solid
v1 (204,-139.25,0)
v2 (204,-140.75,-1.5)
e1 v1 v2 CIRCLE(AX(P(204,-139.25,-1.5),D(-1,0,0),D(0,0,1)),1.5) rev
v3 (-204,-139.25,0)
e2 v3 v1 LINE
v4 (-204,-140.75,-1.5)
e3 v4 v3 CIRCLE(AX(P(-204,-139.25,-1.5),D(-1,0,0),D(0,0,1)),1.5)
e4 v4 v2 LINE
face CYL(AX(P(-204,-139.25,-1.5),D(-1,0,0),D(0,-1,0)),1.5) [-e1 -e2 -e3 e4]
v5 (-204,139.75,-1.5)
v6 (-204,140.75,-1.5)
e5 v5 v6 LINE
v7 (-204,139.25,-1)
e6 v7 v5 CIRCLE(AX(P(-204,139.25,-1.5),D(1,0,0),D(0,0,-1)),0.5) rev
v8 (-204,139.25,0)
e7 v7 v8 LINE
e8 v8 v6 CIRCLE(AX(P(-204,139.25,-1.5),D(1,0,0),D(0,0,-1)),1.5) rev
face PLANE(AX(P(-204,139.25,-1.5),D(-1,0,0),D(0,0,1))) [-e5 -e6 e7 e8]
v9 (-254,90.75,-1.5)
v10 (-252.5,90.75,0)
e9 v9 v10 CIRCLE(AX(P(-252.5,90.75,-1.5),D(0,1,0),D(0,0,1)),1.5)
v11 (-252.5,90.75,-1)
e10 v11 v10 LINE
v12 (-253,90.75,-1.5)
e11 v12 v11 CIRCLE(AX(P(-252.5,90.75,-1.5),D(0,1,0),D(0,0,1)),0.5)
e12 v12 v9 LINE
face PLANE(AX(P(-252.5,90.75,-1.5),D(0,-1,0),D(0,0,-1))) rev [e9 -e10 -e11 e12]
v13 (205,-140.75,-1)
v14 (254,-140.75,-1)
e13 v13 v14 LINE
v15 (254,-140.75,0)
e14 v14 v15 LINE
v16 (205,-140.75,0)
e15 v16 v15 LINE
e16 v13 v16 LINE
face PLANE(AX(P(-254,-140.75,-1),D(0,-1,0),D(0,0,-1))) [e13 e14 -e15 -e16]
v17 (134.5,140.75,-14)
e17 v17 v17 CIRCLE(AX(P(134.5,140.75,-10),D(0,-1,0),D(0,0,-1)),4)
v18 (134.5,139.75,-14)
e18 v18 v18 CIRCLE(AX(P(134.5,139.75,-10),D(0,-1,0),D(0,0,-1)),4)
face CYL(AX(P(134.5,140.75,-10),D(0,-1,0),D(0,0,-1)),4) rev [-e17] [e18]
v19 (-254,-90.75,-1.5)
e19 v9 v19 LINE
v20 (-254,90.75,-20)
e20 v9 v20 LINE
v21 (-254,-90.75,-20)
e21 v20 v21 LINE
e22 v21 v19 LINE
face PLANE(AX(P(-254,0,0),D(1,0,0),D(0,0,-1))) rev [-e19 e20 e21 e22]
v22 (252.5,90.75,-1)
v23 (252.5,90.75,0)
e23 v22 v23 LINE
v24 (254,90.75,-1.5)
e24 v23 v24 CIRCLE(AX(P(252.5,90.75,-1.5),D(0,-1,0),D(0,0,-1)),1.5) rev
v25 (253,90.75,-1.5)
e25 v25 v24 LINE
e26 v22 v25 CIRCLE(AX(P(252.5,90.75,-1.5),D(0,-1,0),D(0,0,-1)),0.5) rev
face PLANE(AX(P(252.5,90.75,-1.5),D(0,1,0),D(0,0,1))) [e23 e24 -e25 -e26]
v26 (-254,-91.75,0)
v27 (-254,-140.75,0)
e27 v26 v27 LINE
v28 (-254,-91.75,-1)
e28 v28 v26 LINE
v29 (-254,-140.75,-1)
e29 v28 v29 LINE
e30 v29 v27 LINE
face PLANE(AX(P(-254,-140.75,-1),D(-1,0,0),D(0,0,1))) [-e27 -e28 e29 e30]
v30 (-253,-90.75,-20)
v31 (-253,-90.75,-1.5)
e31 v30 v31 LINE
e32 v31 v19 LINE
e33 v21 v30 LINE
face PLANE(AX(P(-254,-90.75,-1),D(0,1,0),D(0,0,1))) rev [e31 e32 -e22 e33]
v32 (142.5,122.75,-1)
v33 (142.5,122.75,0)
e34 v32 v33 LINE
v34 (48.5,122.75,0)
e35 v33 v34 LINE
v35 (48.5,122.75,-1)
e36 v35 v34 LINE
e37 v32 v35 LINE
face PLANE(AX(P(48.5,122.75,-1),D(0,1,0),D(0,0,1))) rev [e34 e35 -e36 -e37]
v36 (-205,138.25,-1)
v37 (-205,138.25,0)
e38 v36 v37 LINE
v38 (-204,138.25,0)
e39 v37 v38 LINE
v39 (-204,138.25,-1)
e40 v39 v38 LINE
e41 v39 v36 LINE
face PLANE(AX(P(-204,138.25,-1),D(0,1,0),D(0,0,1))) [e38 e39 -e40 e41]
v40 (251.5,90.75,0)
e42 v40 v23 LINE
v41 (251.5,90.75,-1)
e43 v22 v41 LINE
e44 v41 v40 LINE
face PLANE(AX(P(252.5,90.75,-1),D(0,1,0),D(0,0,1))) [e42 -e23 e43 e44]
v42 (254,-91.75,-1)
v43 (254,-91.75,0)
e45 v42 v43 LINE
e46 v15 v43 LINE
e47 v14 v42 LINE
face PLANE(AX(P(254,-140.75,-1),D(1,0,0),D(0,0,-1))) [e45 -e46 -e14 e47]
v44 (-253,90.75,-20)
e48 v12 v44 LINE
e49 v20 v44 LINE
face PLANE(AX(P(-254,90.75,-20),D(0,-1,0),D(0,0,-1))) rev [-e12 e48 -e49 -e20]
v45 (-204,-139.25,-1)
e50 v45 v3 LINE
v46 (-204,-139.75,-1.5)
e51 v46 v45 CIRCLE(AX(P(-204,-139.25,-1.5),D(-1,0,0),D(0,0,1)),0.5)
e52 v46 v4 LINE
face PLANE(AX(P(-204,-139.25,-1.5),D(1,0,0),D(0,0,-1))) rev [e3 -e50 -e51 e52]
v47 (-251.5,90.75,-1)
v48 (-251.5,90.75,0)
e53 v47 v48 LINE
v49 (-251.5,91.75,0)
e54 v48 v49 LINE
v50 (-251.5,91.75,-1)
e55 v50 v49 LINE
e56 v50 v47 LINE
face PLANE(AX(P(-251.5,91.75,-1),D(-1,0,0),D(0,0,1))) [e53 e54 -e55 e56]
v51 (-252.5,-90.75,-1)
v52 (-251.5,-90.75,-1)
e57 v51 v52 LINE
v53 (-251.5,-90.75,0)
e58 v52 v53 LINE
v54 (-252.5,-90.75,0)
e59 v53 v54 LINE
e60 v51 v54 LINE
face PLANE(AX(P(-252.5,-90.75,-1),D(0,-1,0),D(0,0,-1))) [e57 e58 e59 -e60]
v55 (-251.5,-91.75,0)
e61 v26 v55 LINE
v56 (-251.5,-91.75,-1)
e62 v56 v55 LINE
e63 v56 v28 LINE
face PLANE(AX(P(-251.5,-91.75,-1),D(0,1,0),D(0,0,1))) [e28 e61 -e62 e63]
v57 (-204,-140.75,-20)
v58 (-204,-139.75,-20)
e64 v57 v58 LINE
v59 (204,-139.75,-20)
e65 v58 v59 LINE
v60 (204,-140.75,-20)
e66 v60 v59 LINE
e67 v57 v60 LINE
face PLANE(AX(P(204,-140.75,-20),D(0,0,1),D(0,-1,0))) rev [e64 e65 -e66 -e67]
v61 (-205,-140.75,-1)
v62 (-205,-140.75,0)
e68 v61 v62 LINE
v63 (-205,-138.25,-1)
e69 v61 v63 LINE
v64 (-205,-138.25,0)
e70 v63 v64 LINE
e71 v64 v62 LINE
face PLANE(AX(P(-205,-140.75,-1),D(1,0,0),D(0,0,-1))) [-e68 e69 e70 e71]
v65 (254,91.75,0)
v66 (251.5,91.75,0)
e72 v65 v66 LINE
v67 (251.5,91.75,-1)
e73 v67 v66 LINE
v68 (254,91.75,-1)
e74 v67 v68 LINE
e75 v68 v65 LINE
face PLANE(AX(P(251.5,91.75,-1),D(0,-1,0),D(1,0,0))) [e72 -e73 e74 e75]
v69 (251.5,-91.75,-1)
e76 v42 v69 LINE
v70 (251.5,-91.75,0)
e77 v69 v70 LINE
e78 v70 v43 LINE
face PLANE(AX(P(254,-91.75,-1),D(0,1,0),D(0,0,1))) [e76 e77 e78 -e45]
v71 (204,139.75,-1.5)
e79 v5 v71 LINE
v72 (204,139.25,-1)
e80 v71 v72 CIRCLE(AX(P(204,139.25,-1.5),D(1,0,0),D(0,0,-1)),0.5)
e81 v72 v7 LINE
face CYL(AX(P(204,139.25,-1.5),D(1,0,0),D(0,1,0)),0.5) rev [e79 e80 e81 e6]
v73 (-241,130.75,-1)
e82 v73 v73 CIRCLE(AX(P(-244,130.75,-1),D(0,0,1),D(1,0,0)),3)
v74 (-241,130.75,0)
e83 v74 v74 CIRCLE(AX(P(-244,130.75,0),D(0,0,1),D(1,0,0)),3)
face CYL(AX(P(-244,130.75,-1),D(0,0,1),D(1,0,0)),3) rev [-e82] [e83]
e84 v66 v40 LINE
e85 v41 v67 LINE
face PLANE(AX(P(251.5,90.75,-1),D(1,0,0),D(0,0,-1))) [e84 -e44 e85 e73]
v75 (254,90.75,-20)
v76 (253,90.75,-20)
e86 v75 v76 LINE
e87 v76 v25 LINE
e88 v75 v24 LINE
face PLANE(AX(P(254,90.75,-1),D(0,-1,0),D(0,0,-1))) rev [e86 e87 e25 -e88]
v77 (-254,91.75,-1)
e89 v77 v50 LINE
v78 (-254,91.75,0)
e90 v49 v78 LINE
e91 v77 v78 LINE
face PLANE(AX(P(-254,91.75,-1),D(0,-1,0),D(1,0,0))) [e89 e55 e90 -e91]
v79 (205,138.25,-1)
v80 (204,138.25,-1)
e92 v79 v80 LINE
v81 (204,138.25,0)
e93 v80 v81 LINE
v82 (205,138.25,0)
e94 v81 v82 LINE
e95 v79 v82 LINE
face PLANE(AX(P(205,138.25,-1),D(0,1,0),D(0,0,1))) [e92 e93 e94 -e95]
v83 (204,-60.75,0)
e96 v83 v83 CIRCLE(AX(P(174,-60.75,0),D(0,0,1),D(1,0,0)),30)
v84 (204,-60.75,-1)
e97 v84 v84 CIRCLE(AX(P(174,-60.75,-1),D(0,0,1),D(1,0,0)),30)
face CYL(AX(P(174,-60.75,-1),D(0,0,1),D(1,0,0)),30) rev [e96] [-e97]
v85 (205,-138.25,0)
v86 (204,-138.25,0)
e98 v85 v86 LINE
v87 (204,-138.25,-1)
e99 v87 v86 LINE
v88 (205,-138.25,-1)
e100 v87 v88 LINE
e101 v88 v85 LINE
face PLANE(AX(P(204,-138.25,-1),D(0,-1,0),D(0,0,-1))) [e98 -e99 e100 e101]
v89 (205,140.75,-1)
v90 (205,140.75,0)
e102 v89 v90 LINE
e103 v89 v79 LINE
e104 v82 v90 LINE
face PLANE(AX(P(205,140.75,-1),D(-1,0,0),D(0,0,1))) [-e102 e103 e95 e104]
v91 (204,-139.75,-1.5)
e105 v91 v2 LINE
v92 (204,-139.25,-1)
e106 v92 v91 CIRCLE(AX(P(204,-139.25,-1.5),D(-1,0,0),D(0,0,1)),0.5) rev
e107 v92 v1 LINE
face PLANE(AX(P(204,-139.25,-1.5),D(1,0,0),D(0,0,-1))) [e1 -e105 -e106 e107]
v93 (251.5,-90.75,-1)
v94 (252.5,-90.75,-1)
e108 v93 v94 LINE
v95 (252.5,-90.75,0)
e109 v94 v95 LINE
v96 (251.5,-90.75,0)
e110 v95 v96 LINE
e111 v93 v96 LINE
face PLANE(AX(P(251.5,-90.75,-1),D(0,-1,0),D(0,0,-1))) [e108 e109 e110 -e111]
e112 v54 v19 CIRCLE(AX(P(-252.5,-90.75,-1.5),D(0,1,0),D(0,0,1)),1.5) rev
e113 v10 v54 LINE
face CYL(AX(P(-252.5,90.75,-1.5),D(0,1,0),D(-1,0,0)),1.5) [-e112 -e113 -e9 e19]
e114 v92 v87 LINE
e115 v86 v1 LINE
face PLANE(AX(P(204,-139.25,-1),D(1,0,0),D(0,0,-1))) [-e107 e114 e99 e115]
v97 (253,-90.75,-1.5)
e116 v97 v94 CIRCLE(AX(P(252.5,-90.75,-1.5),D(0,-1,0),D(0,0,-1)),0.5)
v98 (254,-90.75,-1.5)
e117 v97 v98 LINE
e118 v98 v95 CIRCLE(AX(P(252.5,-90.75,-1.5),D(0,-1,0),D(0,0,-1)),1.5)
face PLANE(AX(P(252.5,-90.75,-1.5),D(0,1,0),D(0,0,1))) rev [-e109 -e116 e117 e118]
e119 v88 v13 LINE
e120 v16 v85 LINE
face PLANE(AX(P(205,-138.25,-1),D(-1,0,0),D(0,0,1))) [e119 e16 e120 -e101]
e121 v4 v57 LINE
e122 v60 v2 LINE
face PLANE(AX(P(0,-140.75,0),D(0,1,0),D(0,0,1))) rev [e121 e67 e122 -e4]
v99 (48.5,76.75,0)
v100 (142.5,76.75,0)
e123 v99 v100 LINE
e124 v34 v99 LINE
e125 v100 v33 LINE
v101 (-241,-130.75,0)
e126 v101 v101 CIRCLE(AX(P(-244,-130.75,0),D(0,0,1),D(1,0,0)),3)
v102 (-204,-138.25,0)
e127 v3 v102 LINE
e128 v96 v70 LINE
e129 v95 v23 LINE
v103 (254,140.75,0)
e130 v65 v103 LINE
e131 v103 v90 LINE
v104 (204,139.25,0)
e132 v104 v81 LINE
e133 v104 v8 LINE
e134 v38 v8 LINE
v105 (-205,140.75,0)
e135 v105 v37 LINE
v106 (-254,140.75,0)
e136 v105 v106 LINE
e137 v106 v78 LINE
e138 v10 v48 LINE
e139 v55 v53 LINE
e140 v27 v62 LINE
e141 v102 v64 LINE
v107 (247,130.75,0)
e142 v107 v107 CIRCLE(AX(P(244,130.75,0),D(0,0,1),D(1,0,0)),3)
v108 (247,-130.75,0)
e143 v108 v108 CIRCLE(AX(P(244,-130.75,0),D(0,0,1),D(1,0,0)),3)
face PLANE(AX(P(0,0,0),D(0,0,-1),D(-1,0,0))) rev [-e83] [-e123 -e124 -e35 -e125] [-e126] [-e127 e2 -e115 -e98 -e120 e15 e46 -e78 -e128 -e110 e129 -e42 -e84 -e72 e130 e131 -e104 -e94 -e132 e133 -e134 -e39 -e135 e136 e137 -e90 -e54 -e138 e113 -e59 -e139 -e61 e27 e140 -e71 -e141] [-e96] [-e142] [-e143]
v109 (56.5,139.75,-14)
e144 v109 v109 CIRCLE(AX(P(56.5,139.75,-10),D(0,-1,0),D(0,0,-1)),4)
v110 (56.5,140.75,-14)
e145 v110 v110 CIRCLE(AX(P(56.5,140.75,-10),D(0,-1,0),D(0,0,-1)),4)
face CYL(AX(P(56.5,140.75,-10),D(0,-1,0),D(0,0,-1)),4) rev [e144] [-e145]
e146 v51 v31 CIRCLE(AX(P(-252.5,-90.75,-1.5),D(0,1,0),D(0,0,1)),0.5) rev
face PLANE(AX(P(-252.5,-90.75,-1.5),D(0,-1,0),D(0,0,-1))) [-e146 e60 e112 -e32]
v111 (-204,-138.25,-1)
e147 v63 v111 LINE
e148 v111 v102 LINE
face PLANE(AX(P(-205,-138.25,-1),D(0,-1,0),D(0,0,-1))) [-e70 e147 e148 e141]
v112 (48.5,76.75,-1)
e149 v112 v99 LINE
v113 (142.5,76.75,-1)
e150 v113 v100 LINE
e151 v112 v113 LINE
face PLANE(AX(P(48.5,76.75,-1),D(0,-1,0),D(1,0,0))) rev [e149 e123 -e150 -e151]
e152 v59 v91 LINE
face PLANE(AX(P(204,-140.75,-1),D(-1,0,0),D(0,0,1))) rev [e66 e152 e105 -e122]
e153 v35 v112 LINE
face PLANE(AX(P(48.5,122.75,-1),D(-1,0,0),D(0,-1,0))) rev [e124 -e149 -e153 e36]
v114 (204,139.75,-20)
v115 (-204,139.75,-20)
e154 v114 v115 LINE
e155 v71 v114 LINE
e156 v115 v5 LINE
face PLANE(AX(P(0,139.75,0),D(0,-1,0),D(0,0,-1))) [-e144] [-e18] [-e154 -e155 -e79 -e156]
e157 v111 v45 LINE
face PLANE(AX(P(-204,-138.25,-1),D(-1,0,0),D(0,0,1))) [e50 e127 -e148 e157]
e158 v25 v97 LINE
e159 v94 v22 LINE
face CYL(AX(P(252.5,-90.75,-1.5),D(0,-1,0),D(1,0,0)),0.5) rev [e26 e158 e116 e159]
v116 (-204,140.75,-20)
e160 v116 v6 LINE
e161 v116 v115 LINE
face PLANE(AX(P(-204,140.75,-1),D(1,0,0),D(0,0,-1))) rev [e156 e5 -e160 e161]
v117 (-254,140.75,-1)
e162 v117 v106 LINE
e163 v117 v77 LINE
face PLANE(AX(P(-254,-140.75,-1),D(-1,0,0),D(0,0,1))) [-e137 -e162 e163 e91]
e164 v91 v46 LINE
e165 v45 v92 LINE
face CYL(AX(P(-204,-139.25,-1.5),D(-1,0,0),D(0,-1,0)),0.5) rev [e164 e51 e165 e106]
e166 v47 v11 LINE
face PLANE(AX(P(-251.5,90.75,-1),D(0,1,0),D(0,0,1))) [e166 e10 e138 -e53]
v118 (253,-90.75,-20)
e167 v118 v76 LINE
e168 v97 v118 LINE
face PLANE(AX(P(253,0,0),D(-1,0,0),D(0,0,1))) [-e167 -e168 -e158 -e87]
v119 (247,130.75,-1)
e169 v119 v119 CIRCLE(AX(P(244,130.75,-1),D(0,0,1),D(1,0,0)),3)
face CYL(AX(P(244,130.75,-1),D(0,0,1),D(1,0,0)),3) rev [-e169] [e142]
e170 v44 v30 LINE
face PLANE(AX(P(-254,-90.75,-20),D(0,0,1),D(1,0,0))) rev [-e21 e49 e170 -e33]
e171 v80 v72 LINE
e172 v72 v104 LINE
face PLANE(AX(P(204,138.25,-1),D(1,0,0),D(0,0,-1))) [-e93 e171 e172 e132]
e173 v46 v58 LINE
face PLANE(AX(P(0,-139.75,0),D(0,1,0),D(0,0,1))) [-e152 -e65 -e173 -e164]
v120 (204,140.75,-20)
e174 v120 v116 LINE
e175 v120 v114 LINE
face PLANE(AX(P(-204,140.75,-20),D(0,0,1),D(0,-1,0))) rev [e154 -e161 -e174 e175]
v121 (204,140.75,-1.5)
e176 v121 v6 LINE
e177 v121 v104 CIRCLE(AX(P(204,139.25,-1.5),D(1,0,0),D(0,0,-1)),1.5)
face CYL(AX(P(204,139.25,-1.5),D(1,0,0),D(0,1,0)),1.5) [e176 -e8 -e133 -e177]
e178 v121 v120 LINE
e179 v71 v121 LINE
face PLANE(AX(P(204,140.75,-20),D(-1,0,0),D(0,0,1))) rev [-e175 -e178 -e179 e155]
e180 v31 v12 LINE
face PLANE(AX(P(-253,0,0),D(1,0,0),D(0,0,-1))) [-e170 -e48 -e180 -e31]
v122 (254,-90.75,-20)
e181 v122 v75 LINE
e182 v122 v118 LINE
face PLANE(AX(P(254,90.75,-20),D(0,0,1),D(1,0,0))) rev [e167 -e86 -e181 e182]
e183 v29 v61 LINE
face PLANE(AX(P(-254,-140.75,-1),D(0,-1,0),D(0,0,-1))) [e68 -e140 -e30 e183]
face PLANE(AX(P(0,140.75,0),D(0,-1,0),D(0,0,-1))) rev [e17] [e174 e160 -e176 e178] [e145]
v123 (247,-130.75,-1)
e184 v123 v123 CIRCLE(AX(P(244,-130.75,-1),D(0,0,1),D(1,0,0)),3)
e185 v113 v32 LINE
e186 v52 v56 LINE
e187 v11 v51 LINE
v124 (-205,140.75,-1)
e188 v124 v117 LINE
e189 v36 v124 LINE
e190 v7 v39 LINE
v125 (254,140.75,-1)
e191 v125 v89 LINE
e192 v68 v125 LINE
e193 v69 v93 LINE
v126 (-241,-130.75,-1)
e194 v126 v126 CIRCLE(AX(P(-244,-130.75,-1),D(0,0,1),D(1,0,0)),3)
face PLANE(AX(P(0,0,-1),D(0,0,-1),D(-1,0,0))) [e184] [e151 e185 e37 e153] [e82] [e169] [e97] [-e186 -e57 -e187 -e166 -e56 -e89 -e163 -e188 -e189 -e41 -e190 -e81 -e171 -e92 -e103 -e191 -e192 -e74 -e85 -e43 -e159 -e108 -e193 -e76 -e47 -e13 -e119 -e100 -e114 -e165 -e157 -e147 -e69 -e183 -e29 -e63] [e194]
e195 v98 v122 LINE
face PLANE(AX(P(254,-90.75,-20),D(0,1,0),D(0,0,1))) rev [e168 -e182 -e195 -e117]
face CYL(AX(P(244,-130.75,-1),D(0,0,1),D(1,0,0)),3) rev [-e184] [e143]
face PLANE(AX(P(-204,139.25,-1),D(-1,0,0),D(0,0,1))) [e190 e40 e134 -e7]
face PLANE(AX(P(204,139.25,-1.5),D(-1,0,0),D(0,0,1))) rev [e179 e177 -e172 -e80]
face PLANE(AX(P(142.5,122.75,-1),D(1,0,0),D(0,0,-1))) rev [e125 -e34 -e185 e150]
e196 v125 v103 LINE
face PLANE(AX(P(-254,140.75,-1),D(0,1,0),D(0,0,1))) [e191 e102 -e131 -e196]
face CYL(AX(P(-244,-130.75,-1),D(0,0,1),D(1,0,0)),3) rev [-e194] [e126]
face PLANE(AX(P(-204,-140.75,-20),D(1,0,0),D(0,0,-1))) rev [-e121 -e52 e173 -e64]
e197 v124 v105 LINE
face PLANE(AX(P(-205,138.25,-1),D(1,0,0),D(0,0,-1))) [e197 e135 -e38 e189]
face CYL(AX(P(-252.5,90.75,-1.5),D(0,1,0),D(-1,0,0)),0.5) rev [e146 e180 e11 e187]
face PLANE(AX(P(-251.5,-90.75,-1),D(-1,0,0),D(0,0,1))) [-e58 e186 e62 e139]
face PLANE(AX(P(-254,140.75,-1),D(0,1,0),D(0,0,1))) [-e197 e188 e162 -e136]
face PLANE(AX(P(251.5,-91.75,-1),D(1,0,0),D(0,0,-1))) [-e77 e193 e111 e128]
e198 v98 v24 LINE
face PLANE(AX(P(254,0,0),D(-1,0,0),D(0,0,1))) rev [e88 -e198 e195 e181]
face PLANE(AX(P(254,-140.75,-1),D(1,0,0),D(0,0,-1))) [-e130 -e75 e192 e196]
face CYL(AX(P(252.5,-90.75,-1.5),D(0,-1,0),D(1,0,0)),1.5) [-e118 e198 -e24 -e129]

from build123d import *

# Parameters (mm, degrees)
SKETCH_1_W                        = 508
SKETCH_1_H                        = 281.5
SKETCH_1_R                        = 3
SKETCH_1_R_2                      = 30
SKETCH_1_W_2                      = 94
SKETCH_1_H_2                      = 46
SM_BASE_FLANGE_1_DEPTH            = 1
SM_EDGE_FLANGE_1_STRIP_W          = 5
SM_EDGE_FLANGE_1_STRIP_H          = 1
SM_EDGE_FLANGE_1_STRIP_CUT_DEPTH  = 408
SM_EDGE_FLANGE_1_RELIEF_W         = 6
SM_EDGE_FLANGE_1_RELIEF_H         = 1
SM_EDGE_FLANGE_1_RELIEF_CUT_DEPTH = 1
SM_EDGE_FLANGE_1_DEPTH            = 408
SM_EDGE_FLANGE_2_STRIP_W          = 5
SM_EDGE_FLANGE_2_STRIP_H          = 1
SM_EDGE_FLANGE_2_STRIP_CUT_DEPTH  = 181.5
SM_EDGE_FLANGE_2_RELIEF_W         = 6
SM_EDGE_FLANGE_2_RELIEF_H         = 1
SM_EDGE_FLANGE_2_RELIEF_CUT_DEPTH = 1
SM_EDGE_FLANGE_2_DEPTH            = 181.5
SM_EDGE_FLANGE_3_STRIP_W          = 5
SM_EDGE_FLANGE_3_STRIP_H          = 1
SM_EDGE_FLANGE_3_STRIP_CUT_DEPTH  = 408
SM_EDGE_FLANGE_3_RELIEF_W         = 6
SM_EDGE_FLANGE_3_RELIEF_H         = 1
SM_EDGE_FLANGE_3_RELIEF_CUT_DEPTH = 1
SM_EDGE_FLANGE_3_DEPTH            = 408
SM_EDGE_FLANGE_4_STRIP_W          = 5
SM_EDGE_FLANGE_4_STRIP_H          = 1
SM_EDGE_FLANGE_4_STRIP_CUT_DEPTH  = 181.5
SM_EDGE_FLANGE_4_RELIEF_W         = 6
SM_EDGE_FLANGE_4_RELIEF_H         = 1
SM_EDGE_FLANGE_4_RELIEF_CUT_DEPTH = 1
SM_EDGE_FLANGE_4_DEPTH            = 181.5
SKETCH_32_R                       = 4
CUT_EXTRUDE_1_DEPTH               = 379.940958462


# Sheet-metal steps are written as plain solids
with BuildPart() as part:
    # 基体-法兰1: sheet metal written as solids
    # Sketch 1 → 基体-法兰1 (new body)
    with BuildSketch(Plane.XY):
        Rectangle(SKETCH_1_W, SKETCH_1_H)
        with Locations((-244, 130.75)):
            Circle(SKETCH_1_R, mode=Mode.SUBTRACT)
        with Locations((-244, -130.75)):
            Circle(SKETCH_1_R, mode=Mode.SUBTRACT)
        with Locations((244, 130.75)):
            Circle(SKETCH_1_R, mode=Mode.SUBTRACT)
        with Locations((244, -130.75)):
            Circle(SKETCH_1_R, mode=Mode.SUBTRACT)
        with Locations((174, -60.75)):
            Circle(SKETCH_1_R_2, mode=Mode.SUBTRACT)
        with Locations((95.5, 99.75)):
            Rectangle(SKETCH_1_W_2, SKETCH_1_H_2, mode=Mode.SUBTRACT)
    extrude(amount=-SM_BASE_FLANGE_1_DEPTH)

    # 边线-法兰1: sheet metal written as solids
    # 边线-法兰1 strip (on a plane across the edge) → 边线-法兰1 strip cut (cut)
    with BuildSketch(Plane(origin=(-204, 140.75, -1), x_dir=(0, -1, 0), z_dir=(1, 0, 0))):
        with Locations((-1, -0.5)):
            Rectangle(SM_EDGE_FLANGE_1_STRIP_W, SM_EDGE_FLANGE_1_STRIP_H)
    extrude(amount=SM_EDGE_FLANGE_1_STRIP_CUT_DEPTH, mode=Mode.SUBTRACT)

    # 边线-法兰1 relief (on the sheet) → 边线-法兰1 relief cut (cut)
    with BuildSketch(Plane(origin=(-204, 139.25, -1), x_dir=(0, -1, 0), z_dir=(0, 0, -1))):
        with Locations((-2, 0.5)):
            Rectangle(SM_EDGE_FLANGE_1_RELIEF_W, SM_EDGE_FLANGE_1_RELIEF_H)
        with Locations((-2, -408.5)):
            Rectangle(SM_EDGE_FLANGE_1_RELIEF_W, SM_EDGE_FLANGE_1_RELIEF_H)
    extrude(amount=-SM_EDGE_FLANGE_1_RELIEF_CUT_DEPTH, mode=Mode.SUBTRACT)

    # 边线-法兰1 section (on a plane across the edge) → 边线-法兰1 (add)
    with BuildSketch(Plane(origin=(-204, 140.75, -1), x_dir=(0, -1, 0), z_dir=(1, 0, 0))):
        with BuildLine():
            Line((0, 0.5), (0, 19))
            Line((0, 19), (1, 19))
            Line((1, 19), (1, 0.5))
            ThreePointArc((1, 0.5), (1.146446609, 0.146446609), (1.5, 0))
            Line((1.5, 0), (1.5, -1))
            ThreePointArc((1.5, -1), (0.439339828, -0.560660172), (0, 0.5))
        make_face()
    extrude(amount=SM_EDGE_FLANGE_1_DEPTH)

    # 边线-法兰2: sheet metal written as solids
    # 边线-法兰2 strip (on a plane across the edge) → 边线-法兰2 strip cut (cut)
    with BuildSketch(Plane(origin=(-254, -90.75, -1), x_dir=(1, 0, 0), z_dir=(0, 1, 0))):
        with Locations((-1, -0.5)):
            Rectangle(SM_EDGE_FLANGE_2_STRIP_W, SM_EDGE_FLANGE_2_STRIP_H)
    extrude(amount=SM_EDGE_FLANGE_2_STRIP_CUT_DEPTH, mode=Mode.SUBTRACT)

    # 边线-法兰2 relief (on the sheet) → 边线-法兰2 relief cut (cut)
    with BuildSketch(Plane(origin=(-252.5, -90.75, -1), x_dir=(1, 0, 0), z_dir=(0, 0, -1))):
        with Locations((-2, 0.5)):
            Rectangle(SM_EDGE_FLANGE_2_RELIEF_W, SM_EDGE_FLANGE_2_RELIEF_H)
        with Locations((-2, -182)):
            Rectangle(SM_EDGE_FLANGE_2_RELIEF_W, SM_EDGE_FLANGE_2_RELIEF_H)
    extrude(amount=-SM_EDGE_FLANGE_2_RELIEF_CUT_DEPTH, mode=Mode.SUBTRACT)

    # 边线-法兰2 section (on a plane across the edge) → 边线-法兰2 (add)
    with BuildSketch(Plane(origin=(-254, -90.75, -1), x_dir=(1, 0, 0), z_dir=(0, 1, 0))):
        with BuildLine():
            Line((0, 0.5), (0, 19))
            Line((0, 19), (1, 19))
            Line((1, 19), (1, 0.5))
            ThreePointArc((1, 0.5), (1.146446609, 0.146446609), (1.5, 0))
            Line((1.5, 0), (1.5, -1))
            ThreePointArc((1.5, -1), (0.439339828, -0.560660172), (0, 0.5))
        make_face()
    extrude(amount=SM_EDGE_FLANGE_2_DEPTH)

    # 边线-法兰3: sheet metal written as solids
    # 边线-法兰3 strip (on a plane across the edge) → 边线-法兰3 strip cut (cut)
    with BuildSketch(Plane(origin=(204, -140.75, -1), x_dir=(0, 1, 0), z_dir=(-1, 0, 0))):
        with Locations((-1, -0.5)):
            Rectangle(SM_EDGE_FLANGE_3_STRIP_W, SM_EDGE_FLANGE_3_STRIP_H)
    extrude(amount=SM_EDGE_FLANGE_3_STRIP_CUT_DEPTH, mode=Mode.SUBTRACT)

    # 边线-法兰3 relief (on the sheet) → 边线-法兰3 relief cut (cut)
    with BuildSketch(Plane(origin=(204, -139.25, -1), x_dir=(0, 1, 0), z_dir=(0, 0, -1))):
        with Locations((-2, 0.5)):
            Rectangle(SM_EDGE_FLANGE_3_RELIEF_W, SM_EDGE_FLANGE_3_RELIEF_H)
        with Locations((-2, -408.5)):
            Rectangle(SM_EDGE_FLANGE_3_RELIEF_W, SM_EDGE_FLANGE_3_RELIEF_H)
    extrude(amount=-SM_EDGE_FLANGE_3_RELIEF_CUT_DEPTH, mode=Mode.SUBTRACT)

    # 边线-法兰3 section (on a plane across the edge) → 边线-法兰3 (add)
    with BuildSketch(Plane(origin=(204, -140.75, -1), x_dir=(0, 1, 0), z_dir=(-1, 0, 0))):
        with BuildLine():
            Line((0, 0.5), (0, 19))
            Line((0, 19), (1, 19))
            Line((1, 19), (1, 0.5))
            ThreePointArc((1, 0.5), (1.146446609, 0.146446609), (1.5, 0))
            Line((1.5, 0), (1.5, -1))
            ThreePointArc((1.5, -1), (0.439339828, -0.560660172), (0, 0.5))
        make_face()
    extrude(amount=SM_EDGE_FLANGE_3_DEPTH)

    # 边线-法兰4: sheet metal written as solids
    # 边线-法兰4 strip (on a plane across the edge) → 边线-法兰4 strip cut (cut)
    with BuildSketch(Plane(origin=(254, 90.75, -1), x_dir=(-1, 0, 0), z_dir=(0, -1, 0))):
        with Locations((-1, -0.5)):
            Rectangle(SM_EDGE_FLANGE_4_STRIP_W, SM_EDGE_FLANGE_4_STRIP_H)
    extrude(amount=SM_EDGE_FLANGE_4_STRIP_CUT_DEPTH, mode=Mode.SUBTRACT)

    # 边线-法兰4 relief (on the sheet) → 边线-法兰4 relief cut (cut)
    with BuildSketch(Plane(origin=(252.5, 90.75, -1), x_dir=(-1, 0, 0), z_dir=(0, 0, -1))):
        with Locations((-2, 0.5)):
            Rectangle(SM_EDGE_FLANGE_4_RELIEF_W, SM_EDGE_FLANGE_4_RELIEF_H)
        with Locations((-2, -182)):
            Rectangle(SM_EDGE_FLANGE_4_RELIEF_W, SM_EDGE_FLANGE_4_RELIEF_H)
    extrude(amount=-SM_EDGE_FLANGE_4_RELIEF_CUT_DEPTH, mode=Mode.SUBTRACT)

    # 边线-法兰4 section (on a plane across the edge) → 边线-法兰4 (add)
    with BuildSketch(Plane(origin=(254, 90.75, -1), x_dir=(-1, 0, 0), z_dir=(0, -1, 0))):
        with BuildLine():
            Line((0, 0.5), (0, 19))
            Line((0, 19), (1, 19))
            Line((1, 19), (1, 0.5))
            ThreePointArc((1, 0.5), (1.146446609, 0.146446609), (1.5, 0))
            Line((1.5, 0), (1.5, -1))
            ThreePointArc((1.5, -1), (0.439339828, -0.560660172), (0, 0.5))
        make_face()
    extrude(amount=SM_EDGE_FLANGE_4_DEPTH)

    # 草图32 → 切除-拉伸1 (cut, through all)
    with BuildSketch(Plane(origin=(0, 139.75, 0), x_dir=(-1, 0, 0), z_dir=(0, -1, 0))):
        with Locations(Location((-134.5, 10, 0), (0, 0, 90))):
            Circle(SKETCH_32_R)
        with Locations(Location((-56.5, 10, 0), (0, 0, 90))):
            Circle(SKETCH_32_R)
    extrude(amount=-CUT_EXTRUDE_1_DEPTH, mode=Mode.SUBTRACT)


solid = part.part
